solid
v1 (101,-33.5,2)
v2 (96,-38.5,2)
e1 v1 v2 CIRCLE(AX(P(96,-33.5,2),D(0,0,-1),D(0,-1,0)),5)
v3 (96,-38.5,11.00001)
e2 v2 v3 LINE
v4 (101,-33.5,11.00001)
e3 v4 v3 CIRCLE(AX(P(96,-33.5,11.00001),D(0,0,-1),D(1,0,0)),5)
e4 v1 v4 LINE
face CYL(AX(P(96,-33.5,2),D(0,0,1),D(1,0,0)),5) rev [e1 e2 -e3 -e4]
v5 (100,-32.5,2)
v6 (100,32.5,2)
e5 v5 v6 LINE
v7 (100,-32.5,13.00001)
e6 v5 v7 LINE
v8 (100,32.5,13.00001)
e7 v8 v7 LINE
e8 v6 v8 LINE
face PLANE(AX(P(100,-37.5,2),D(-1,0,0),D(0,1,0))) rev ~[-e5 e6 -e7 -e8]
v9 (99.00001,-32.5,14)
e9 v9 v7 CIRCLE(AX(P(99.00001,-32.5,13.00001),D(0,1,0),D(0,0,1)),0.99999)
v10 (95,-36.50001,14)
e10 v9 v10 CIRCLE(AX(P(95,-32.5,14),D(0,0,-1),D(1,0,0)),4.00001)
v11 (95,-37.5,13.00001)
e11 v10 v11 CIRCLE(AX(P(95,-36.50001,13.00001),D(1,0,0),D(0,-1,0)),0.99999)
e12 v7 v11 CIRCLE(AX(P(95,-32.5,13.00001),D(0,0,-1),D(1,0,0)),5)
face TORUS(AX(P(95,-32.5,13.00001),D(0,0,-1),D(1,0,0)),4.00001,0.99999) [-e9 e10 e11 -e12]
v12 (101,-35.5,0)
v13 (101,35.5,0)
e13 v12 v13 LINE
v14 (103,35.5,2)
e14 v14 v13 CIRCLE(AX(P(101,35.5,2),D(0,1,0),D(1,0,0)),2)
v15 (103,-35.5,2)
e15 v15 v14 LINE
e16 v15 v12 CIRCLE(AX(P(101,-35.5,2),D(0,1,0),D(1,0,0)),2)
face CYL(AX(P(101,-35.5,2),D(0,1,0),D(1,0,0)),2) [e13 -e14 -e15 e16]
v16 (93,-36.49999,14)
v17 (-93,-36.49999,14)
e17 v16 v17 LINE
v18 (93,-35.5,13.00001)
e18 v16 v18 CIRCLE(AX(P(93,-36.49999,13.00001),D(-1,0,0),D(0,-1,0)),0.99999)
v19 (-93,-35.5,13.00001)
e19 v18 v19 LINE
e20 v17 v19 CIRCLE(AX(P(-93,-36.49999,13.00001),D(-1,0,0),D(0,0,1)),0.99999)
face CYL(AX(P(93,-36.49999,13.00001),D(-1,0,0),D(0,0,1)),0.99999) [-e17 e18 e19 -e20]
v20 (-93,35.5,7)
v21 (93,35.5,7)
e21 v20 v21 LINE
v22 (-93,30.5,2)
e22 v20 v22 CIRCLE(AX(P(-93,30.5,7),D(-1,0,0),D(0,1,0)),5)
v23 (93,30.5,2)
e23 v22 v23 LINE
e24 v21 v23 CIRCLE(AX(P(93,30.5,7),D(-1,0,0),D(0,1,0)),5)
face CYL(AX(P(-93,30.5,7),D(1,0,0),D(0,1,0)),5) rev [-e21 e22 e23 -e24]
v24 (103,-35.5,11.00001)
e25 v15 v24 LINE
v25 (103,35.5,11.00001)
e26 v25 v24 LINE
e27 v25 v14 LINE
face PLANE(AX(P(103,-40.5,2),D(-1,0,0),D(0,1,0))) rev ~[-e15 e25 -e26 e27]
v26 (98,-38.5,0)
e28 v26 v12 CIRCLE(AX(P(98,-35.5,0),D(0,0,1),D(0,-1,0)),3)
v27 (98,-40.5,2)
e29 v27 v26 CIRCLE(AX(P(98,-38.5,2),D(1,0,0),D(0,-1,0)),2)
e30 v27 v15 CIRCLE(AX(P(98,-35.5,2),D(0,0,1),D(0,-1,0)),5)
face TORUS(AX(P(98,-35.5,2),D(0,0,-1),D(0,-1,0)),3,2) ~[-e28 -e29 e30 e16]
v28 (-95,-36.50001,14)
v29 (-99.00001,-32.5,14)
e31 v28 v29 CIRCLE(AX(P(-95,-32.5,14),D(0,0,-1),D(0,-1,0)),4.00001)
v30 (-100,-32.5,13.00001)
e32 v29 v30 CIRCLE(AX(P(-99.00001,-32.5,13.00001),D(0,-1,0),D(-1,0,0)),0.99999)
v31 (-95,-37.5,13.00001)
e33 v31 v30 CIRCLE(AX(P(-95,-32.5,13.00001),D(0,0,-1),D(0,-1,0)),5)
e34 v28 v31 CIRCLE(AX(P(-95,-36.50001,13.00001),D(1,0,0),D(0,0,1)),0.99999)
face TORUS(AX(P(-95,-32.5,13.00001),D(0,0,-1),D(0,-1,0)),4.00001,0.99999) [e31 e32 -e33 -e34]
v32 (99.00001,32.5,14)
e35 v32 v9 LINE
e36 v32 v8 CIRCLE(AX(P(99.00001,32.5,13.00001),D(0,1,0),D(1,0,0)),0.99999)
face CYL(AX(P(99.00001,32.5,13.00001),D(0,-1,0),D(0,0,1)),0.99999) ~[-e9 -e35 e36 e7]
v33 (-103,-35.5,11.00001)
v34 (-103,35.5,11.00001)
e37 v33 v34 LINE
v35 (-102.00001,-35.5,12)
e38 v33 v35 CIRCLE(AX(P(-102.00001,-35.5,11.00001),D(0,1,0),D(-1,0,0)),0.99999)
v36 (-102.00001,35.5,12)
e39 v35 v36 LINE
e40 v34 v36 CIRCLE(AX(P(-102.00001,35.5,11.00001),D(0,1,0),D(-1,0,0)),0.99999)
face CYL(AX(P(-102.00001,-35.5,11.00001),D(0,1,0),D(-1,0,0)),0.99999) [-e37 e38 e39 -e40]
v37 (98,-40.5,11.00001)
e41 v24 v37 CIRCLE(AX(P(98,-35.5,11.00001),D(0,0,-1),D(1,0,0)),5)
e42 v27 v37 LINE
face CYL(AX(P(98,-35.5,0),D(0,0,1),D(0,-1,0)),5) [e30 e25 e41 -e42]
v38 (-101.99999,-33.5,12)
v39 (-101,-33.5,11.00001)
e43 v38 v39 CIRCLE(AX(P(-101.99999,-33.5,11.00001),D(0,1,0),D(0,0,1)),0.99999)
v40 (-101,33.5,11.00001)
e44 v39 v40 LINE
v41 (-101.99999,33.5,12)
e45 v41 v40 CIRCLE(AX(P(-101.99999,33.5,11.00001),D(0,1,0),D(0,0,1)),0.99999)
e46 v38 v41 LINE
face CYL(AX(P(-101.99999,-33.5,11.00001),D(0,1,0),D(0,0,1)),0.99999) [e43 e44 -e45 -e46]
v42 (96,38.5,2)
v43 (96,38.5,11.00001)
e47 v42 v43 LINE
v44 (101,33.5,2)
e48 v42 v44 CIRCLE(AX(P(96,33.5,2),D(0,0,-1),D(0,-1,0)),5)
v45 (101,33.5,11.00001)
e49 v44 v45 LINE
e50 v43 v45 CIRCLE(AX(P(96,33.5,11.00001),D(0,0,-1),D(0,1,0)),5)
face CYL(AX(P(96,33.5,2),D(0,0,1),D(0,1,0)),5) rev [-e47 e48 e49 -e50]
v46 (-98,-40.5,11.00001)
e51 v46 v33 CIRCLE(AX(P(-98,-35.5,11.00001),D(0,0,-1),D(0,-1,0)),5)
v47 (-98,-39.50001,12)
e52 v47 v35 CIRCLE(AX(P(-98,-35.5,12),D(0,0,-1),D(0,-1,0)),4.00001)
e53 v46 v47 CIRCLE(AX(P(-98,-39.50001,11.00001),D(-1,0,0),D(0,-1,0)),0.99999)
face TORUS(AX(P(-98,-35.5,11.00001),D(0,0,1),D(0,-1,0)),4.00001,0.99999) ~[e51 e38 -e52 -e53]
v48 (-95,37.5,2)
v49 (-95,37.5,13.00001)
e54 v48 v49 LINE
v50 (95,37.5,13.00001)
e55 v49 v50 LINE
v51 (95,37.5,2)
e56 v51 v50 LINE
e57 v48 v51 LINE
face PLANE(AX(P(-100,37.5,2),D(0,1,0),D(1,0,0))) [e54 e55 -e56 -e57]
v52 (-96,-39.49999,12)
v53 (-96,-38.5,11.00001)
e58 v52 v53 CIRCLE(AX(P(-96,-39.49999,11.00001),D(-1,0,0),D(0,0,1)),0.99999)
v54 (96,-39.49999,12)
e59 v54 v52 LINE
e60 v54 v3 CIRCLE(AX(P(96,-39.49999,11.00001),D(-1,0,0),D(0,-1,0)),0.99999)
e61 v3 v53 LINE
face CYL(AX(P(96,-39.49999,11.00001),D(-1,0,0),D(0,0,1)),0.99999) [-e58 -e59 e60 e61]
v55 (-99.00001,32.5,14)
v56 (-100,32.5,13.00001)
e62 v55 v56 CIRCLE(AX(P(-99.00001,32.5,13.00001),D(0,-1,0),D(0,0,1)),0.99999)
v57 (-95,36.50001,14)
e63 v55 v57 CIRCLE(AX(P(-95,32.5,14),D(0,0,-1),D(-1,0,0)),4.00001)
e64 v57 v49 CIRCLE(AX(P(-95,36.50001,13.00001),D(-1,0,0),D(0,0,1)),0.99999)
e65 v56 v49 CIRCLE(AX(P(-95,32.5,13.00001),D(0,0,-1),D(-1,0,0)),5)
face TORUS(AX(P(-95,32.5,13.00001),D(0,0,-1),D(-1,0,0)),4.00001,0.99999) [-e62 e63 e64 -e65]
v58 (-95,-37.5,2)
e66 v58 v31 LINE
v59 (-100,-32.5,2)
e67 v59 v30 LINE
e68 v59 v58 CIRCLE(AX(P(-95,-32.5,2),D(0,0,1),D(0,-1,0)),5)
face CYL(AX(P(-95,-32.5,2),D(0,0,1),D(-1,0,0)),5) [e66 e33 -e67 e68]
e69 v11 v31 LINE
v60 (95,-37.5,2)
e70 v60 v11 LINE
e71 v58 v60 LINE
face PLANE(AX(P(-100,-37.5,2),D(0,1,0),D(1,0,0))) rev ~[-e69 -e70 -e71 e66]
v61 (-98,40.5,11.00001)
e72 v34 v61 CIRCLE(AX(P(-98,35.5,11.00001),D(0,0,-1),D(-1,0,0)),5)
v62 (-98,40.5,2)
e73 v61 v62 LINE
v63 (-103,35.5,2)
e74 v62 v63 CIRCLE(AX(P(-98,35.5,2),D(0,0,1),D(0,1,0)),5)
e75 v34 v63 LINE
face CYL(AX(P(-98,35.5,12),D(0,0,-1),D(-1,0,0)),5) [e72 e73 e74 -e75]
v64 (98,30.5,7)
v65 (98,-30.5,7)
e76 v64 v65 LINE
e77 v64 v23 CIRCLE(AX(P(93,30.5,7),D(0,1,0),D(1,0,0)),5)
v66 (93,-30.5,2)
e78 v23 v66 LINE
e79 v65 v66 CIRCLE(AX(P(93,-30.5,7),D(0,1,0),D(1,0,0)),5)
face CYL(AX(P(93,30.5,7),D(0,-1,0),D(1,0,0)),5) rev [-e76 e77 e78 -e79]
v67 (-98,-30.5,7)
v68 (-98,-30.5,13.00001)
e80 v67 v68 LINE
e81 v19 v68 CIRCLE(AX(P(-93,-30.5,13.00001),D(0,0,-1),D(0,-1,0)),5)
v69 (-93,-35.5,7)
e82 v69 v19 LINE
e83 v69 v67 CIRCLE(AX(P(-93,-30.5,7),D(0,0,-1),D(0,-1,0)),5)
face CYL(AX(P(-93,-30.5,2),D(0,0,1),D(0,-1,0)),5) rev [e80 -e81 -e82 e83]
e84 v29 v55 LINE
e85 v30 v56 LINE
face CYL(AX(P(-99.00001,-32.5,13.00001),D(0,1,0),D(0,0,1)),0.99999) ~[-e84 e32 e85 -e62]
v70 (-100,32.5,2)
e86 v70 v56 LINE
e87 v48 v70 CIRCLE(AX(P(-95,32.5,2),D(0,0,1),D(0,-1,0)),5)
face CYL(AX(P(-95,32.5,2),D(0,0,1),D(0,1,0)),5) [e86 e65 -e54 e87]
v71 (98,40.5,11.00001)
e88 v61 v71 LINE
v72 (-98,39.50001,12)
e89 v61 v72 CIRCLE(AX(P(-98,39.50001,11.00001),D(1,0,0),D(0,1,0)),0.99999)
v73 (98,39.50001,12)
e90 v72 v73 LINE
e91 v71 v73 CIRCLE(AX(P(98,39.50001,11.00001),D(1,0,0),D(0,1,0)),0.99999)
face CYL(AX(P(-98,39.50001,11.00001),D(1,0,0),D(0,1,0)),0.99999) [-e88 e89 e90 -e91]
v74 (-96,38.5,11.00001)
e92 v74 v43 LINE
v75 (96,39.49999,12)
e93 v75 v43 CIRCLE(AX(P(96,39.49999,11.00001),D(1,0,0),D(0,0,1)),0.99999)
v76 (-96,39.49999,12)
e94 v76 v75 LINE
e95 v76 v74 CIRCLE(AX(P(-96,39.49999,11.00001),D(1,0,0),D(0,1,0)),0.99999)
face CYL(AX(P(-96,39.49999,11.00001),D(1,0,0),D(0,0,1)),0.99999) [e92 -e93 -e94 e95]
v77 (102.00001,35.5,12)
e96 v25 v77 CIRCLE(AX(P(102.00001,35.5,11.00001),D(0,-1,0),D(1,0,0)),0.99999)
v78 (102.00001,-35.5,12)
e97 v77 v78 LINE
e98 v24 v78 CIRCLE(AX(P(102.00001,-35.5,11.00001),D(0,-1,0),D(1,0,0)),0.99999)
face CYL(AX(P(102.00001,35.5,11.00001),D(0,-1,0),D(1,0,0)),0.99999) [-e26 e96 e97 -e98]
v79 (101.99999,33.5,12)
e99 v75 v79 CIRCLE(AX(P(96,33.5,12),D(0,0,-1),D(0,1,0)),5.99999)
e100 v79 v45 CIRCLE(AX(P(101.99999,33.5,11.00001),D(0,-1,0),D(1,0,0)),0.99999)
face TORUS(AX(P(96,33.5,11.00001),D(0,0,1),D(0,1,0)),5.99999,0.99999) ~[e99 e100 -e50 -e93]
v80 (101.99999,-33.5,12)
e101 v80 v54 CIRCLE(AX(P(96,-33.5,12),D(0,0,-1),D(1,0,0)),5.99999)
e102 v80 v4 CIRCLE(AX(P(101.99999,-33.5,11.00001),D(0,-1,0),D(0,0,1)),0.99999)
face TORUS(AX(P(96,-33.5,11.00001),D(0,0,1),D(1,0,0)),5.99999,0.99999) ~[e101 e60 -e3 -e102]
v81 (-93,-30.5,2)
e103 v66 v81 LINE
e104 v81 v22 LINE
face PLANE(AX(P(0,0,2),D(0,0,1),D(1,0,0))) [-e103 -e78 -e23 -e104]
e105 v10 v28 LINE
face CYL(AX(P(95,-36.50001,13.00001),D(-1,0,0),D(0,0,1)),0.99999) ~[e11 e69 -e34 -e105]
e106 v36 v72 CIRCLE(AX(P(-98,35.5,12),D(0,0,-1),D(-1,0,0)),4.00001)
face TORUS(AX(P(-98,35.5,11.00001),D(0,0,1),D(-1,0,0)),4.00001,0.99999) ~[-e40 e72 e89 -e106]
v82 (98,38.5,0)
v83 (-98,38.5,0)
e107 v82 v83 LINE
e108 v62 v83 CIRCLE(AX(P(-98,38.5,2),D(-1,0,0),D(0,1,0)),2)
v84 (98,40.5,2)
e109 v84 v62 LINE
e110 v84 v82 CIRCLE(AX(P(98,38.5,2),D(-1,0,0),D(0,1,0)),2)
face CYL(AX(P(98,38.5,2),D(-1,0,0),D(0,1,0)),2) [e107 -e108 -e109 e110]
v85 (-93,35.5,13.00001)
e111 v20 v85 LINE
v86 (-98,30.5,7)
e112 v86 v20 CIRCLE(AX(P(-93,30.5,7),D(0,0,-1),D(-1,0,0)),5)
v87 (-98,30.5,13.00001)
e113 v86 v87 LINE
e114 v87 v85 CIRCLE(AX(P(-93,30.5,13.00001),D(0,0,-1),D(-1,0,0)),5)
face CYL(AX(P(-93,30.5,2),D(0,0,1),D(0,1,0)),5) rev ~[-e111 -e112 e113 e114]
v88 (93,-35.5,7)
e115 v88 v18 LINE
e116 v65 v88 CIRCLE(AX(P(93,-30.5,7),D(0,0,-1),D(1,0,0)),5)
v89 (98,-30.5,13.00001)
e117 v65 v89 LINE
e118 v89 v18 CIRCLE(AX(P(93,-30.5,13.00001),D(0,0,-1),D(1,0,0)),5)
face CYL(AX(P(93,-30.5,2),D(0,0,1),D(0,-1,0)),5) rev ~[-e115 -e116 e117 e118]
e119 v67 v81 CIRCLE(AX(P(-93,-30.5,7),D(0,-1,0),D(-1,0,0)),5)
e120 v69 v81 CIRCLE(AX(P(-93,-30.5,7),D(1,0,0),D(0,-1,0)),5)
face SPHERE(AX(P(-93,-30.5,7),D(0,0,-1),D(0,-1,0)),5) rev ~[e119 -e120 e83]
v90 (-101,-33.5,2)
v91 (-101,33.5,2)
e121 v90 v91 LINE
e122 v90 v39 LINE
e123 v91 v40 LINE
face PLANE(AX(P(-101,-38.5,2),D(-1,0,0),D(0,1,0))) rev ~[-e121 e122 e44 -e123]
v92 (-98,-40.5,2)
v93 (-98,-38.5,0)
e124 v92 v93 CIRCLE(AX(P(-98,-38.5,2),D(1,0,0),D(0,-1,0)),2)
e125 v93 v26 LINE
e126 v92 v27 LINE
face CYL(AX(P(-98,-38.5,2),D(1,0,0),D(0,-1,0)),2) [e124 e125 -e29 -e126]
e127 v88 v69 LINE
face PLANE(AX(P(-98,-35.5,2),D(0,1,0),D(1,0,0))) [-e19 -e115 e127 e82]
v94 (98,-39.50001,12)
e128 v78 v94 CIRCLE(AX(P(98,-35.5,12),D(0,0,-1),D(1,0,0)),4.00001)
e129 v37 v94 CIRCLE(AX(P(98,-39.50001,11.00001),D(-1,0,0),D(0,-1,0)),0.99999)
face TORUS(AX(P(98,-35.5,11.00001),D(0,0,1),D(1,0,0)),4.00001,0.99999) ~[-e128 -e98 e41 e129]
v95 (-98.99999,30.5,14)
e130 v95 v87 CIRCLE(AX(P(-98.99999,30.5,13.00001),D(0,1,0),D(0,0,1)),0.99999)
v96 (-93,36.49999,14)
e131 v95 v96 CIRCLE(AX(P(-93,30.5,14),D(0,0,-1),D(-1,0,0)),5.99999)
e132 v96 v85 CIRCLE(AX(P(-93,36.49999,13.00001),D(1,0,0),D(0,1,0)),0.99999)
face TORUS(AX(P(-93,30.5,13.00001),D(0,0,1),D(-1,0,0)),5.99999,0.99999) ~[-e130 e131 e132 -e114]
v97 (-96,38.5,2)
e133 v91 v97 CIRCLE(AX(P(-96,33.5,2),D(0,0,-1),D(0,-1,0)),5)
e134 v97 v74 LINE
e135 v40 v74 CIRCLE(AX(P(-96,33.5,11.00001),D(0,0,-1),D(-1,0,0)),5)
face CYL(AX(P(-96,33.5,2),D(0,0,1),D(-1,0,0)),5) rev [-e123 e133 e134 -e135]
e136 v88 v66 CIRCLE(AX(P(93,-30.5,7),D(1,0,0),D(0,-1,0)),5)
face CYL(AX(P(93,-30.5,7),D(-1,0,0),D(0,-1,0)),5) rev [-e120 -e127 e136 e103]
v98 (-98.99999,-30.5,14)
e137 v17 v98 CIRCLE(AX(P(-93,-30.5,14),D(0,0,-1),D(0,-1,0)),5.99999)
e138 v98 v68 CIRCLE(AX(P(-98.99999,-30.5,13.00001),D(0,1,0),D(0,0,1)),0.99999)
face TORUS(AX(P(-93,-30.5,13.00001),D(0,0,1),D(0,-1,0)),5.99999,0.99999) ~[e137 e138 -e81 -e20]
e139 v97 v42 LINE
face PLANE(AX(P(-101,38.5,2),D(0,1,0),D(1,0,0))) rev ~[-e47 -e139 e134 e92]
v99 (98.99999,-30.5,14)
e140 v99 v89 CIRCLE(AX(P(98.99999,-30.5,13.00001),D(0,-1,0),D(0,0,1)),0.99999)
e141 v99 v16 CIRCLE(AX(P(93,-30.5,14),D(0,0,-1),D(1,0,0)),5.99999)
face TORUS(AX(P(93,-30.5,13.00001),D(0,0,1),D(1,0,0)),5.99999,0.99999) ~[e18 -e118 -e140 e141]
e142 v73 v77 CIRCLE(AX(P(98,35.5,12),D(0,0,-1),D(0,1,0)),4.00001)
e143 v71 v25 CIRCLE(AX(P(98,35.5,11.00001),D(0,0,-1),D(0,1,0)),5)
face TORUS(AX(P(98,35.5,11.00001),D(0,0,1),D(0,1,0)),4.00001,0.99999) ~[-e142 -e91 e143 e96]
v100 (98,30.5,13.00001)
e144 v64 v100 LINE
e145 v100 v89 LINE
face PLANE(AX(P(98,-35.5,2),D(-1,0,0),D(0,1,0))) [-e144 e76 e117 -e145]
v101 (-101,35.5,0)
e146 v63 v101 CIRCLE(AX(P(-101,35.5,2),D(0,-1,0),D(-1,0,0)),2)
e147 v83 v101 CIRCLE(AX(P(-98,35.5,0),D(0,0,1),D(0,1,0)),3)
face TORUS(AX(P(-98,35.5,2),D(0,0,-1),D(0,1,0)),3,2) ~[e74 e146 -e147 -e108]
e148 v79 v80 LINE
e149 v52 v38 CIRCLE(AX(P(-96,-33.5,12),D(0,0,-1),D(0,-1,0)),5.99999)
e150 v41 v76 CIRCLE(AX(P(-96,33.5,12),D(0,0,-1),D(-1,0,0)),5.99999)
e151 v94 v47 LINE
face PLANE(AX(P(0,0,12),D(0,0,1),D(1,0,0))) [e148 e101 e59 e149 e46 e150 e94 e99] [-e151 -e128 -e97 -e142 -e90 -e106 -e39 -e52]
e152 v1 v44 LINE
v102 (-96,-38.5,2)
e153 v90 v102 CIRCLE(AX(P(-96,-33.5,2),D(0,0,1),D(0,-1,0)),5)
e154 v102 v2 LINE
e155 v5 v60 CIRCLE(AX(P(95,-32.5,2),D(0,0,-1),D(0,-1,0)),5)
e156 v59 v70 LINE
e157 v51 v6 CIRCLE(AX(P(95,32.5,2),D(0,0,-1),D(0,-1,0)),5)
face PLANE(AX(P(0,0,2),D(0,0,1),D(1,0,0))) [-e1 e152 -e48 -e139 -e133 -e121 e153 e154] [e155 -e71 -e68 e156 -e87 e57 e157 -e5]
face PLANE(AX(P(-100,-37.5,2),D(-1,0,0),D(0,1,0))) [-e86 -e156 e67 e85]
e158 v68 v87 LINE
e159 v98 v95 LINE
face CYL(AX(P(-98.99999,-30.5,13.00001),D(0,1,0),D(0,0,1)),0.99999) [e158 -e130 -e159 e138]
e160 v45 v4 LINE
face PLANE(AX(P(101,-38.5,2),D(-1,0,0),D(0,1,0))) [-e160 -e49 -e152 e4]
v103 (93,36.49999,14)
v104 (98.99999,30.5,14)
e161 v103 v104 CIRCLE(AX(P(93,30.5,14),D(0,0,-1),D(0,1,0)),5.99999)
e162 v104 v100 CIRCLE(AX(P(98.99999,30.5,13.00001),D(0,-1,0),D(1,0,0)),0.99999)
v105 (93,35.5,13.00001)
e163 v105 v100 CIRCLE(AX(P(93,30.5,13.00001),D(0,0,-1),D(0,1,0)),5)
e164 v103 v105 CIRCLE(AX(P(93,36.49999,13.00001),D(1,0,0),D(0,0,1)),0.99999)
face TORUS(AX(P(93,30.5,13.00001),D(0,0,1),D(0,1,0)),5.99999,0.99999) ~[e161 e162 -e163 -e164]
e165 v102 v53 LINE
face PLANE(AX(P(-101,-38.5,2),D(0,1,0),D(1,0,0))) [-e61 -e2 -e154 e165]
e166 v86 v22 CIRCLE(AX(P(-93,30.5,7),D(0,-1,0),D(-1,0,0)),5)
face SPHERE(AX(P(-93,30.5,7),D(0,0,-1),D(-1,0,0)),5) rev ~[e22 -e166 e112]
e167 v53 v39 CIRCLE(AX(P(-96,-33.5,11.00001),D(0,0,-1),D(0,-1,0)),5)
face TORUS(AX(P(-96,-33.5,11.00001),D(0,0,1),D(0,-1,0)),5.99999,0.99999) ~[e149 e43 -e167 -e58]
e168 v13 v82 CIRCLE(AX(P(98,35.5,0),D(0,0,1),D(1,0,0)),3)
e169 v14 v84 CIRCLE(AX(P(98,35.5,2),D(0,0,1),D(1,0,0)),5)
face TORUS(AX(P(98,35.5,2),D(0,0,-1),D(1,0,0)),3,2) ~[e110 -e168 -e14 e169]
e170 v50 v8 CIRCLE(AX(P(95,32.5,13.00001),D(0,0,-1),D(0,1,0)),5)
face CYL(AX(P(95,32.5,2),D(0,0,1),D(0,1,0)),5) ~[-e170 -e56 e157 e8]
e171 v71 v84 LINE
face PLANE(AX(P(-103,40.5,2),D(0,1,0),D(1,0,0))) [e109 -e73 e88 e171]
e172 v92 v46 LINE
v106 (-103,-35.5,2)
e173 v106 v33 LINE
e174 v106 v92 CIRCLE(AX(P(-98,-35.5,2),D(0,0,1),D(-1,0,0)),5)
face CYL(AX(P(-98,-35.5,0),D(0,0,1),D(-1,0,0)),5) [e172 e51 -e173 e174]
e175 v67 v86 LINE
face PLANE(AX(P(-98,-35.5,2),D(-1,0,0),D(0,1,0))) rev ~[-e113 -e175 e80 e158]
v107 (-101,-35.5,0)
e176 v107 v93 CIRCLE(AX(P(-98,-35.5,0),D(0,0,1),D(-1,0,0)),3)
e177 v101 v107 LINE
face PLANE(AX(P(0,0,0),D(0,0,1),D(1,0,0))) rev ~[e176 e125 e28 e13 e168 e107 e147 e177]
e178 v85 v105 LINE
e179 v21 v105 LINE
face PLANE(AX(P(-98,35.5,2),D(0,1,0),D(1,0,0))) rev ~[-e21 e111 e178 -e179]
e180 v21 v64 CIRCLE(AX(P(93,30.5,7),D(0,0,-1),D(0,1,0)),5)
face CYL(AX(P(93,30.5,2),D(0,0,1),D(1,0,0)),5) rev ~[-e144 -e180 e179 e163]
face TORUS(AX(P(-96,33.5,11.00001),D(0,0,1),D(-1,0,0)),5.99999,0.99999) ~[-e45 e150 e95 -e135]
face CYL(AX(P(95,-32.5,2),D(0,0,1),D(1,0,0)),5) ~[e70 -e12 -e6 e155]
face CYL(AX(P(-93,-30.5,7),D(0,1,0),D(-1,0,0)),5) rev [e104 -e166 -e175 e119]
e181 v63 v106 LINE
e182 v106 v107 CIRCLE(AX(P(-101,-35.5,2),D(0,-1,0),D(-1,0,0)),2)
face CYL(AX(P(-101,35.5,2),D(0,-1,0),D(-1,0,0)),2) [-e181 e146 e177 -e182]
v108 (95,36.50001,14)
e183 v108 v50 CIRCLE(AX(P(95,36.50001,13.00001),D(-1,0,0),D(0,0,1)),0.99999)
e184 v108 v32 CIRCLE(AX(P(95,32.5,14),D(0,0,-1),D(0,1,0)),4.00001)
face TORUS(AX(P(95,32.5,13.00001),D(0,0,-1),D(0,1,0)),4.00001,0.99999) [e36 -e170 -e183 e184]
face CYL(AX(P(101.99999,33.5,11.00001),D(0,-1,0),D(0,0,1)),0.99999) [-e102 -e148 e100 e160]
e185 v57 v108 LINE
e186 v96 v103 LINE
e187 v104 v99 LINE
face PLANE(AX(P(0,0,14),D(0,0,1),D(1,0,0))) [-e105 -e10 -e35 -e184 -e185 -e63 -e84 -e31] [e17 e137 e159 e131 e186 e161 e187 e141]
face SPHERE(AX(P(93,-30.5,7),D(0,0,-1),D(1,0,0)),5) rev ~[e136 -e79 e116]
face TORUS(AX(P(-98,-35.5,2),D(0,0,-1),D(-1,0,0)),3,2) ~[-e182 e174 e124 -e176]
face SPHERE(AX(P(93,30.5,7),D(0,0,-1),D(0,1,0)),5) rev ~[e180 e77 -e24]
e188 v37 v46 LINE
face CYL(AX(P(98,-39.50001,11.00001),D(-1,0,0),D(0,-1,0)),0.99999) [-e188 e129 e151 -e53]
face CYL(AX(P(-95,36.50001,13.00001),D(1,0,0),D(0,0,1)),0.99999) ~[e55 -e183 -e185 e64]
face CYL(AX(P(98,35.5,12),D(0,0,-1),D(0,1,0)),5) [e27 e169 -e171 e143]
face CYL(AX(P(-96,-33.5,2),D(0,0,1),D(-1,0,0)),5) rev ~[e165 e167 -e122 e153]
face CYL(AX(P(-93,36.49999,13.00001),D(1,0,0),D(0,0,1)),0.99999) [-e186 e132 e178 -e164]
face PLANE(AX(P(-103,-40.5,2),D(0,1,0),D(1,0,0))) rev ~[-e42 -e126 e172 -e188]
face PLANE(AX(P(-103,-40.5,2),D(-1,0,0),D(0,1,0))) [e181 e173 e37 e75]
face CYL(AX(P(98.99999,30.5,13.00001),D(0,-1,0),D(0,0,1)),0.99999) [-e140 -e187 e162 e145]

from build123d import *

# Parameters (mm, degrees)
F0_W     = 206
F0_H     = 81
F1_DEPTH = 2
F2_W     = 200
F2_H     = 75
F2_W_2   = 196
F2_H_2   = 71
F3_DEPTH = 12
F2_W_3   = 206
F2_H_3   = 81
F2_W_4   = 202
F2_H_4   = 77
F4_DEPTH = 10
F5_R     = 5
F6_R     = 5
F7_R     = 0.99999
F8_R     = 5
F9_R     = 5
F10_R    = 2
F11_R    = 0.99999
F12_R    = 5


# Not quite as in the source:
# - a fillet or chamfer is up to 0.001 mm smaller than in the source, because OpenCascade refuses the exact size


with BuildPart() as f1:
    # F0 (on Top) → F1 (new body)
    with BuildSketch(Plane.XY):
        Rectangle(F0_W, F0_H)
    extrude(amount=F1_DEPTH)

    # F2 (on face) → F3 (join)
    with BuildSketch(Plane.XY.offset(2)):
        Rectangle(F2_W, F2_H)
        Rectangle(F2_W_2, F2_H_2, mode=Mode.SUBTRACT)
    extrude(amount=F3_DEPTH)

    # F2 (on face) → F4 (join)
    with BuildSketch(Plane.XY.offset(2)):
        Rectangle(F2_W_3, F2_H_3)
        Rectangle(F2_W_4, F2_H_4, mode=Mode.SUBTRACT)
    extrude(amount=F4_DEPTH)

    # F5
    f5_edges = [f1.edges().sort_by_distance(p)[0] for p in [
        (-100, -37.5, 8),
        (-100, 37.5, 8),
        (100, 37.5, 8),
        (100, -37.5, 8),
    ]]
    fillet(f5_edges, radius=F5_R)

    # F6
    f6_edges = [f1.edges().sort_by_distance(p)[0] for p in [
        (-98, -35.5, 8),
        (-98, 35.5, 8),
        (98, 35.5, 8),
        (98, -35.5, 8),
    ]]
    fillet(f6_edges, radius=F6_R)

    # F7 (radius 1 in the source; OpenCascade refuses exactly that, so slightly less here)
    f7_edges = [f1.edges().sort_by_distance(p)[0] for p in [
        (-98, 0, 14),
        (-96.535534, -34.035534, 14),
        (-96.535534, 34.035534, 14),
        (0, -35.5, 14),
        (0, 35.5, 14),
        (96.535534, -34.035534, 14),
        (96.535534, 34.035534, 14),
        (98, 0, 14),
        (0, 37.5, 14),
        (98.535534, 36.035534, 14),
        (-98.535534, 36.035534, 14),
        (100, 0, 14),
        (-100, 0, 14),
        (98.535534, -36.035534, 14),
        (-98.535534, -36.035534, 14),
        (0, -37.5, 14),
    ]]
    fillet(f7_edges, radius=F7_R)

    # F8
    f8_edges = [f1.edges().sort_by_distance(p)[0] for p in [
        (-101, 38.5, 7),
        (-101, -38.5, 7),
        (101, -38.5, 7),
        (101, 38.5, 7),
    ]]
    fillet(f8_edges, radius=F8_R)

    # F9
    f9_edges = [f1.edges().sort_by_distance(p)[0] for p in [
        (-103, -40.5, 6),
        (103, -40.5, 6),
        (103, 40.5, 6),
        (-103, 40.5, 6),
    ]]
    fillet(f9_edges, radius=F9_R)

    # F10
    f10_edges = [f1.edges().sort_by_distance(p)[0] for p in [
        (0, -40.5, 0),
        (-101.535534, -39.035534, 0),
        (101.535534, -39.035534, 0),
        (-103, 0, 0),
        (103, 0, 0),
        (-101.535534, 39.035534, 0),
        (101.535534, 39.035534, 0),
        (0, 40.5, 0),
    ]]
    fillet(f10_edges, radius=F10_R)

    # F11 (radius 1 in the source; OpenCascade refuses exactly that, so slightly less here)
    f11_edges = [f1.edges().sort_by_distance(p)[0] for p in [
        (-103, 0, 12),
        (-101.535534, 39.035534, 12),
        (-101.535534, -39.035534, 12),
        (0, 40.5, 12),
        (0, -40.5, 12),
        (101.535534, 39.035534, 12),
        (101.535534, -39.035534, 12),
        (103, 0, 12),
        (-101, 0, 12),
        (-99.535534, -37.035534, 12),
        (-99.535534, 37.035534, 12),
        (0, -38.5, 12),
        (0, 38.5, 12),
        (99.535534, -37.035534, 12),
        (99.535534, 37.035534, 12),
        (101, 0, 12),
    ]]
    fillet(f11_edges, radius=F11_R)

    # F12
    f12_edges = [f1.edges().sort_by_distance(p)[0] for p in [
        (-98, 0, 2),
        (-96.535534, -34.035534, 2),
        (-96.535534, 34.035534, 2),
        (0, -35.5, 2),
        (0, 35.5, 2),
        (96.535534, -34.035534, 2),
        (96.535534, 34.035534, 2),
        (98, 0, 2),
    ]]
    fillet(f12_edges, radius=F12_R)


solid = f1.part
